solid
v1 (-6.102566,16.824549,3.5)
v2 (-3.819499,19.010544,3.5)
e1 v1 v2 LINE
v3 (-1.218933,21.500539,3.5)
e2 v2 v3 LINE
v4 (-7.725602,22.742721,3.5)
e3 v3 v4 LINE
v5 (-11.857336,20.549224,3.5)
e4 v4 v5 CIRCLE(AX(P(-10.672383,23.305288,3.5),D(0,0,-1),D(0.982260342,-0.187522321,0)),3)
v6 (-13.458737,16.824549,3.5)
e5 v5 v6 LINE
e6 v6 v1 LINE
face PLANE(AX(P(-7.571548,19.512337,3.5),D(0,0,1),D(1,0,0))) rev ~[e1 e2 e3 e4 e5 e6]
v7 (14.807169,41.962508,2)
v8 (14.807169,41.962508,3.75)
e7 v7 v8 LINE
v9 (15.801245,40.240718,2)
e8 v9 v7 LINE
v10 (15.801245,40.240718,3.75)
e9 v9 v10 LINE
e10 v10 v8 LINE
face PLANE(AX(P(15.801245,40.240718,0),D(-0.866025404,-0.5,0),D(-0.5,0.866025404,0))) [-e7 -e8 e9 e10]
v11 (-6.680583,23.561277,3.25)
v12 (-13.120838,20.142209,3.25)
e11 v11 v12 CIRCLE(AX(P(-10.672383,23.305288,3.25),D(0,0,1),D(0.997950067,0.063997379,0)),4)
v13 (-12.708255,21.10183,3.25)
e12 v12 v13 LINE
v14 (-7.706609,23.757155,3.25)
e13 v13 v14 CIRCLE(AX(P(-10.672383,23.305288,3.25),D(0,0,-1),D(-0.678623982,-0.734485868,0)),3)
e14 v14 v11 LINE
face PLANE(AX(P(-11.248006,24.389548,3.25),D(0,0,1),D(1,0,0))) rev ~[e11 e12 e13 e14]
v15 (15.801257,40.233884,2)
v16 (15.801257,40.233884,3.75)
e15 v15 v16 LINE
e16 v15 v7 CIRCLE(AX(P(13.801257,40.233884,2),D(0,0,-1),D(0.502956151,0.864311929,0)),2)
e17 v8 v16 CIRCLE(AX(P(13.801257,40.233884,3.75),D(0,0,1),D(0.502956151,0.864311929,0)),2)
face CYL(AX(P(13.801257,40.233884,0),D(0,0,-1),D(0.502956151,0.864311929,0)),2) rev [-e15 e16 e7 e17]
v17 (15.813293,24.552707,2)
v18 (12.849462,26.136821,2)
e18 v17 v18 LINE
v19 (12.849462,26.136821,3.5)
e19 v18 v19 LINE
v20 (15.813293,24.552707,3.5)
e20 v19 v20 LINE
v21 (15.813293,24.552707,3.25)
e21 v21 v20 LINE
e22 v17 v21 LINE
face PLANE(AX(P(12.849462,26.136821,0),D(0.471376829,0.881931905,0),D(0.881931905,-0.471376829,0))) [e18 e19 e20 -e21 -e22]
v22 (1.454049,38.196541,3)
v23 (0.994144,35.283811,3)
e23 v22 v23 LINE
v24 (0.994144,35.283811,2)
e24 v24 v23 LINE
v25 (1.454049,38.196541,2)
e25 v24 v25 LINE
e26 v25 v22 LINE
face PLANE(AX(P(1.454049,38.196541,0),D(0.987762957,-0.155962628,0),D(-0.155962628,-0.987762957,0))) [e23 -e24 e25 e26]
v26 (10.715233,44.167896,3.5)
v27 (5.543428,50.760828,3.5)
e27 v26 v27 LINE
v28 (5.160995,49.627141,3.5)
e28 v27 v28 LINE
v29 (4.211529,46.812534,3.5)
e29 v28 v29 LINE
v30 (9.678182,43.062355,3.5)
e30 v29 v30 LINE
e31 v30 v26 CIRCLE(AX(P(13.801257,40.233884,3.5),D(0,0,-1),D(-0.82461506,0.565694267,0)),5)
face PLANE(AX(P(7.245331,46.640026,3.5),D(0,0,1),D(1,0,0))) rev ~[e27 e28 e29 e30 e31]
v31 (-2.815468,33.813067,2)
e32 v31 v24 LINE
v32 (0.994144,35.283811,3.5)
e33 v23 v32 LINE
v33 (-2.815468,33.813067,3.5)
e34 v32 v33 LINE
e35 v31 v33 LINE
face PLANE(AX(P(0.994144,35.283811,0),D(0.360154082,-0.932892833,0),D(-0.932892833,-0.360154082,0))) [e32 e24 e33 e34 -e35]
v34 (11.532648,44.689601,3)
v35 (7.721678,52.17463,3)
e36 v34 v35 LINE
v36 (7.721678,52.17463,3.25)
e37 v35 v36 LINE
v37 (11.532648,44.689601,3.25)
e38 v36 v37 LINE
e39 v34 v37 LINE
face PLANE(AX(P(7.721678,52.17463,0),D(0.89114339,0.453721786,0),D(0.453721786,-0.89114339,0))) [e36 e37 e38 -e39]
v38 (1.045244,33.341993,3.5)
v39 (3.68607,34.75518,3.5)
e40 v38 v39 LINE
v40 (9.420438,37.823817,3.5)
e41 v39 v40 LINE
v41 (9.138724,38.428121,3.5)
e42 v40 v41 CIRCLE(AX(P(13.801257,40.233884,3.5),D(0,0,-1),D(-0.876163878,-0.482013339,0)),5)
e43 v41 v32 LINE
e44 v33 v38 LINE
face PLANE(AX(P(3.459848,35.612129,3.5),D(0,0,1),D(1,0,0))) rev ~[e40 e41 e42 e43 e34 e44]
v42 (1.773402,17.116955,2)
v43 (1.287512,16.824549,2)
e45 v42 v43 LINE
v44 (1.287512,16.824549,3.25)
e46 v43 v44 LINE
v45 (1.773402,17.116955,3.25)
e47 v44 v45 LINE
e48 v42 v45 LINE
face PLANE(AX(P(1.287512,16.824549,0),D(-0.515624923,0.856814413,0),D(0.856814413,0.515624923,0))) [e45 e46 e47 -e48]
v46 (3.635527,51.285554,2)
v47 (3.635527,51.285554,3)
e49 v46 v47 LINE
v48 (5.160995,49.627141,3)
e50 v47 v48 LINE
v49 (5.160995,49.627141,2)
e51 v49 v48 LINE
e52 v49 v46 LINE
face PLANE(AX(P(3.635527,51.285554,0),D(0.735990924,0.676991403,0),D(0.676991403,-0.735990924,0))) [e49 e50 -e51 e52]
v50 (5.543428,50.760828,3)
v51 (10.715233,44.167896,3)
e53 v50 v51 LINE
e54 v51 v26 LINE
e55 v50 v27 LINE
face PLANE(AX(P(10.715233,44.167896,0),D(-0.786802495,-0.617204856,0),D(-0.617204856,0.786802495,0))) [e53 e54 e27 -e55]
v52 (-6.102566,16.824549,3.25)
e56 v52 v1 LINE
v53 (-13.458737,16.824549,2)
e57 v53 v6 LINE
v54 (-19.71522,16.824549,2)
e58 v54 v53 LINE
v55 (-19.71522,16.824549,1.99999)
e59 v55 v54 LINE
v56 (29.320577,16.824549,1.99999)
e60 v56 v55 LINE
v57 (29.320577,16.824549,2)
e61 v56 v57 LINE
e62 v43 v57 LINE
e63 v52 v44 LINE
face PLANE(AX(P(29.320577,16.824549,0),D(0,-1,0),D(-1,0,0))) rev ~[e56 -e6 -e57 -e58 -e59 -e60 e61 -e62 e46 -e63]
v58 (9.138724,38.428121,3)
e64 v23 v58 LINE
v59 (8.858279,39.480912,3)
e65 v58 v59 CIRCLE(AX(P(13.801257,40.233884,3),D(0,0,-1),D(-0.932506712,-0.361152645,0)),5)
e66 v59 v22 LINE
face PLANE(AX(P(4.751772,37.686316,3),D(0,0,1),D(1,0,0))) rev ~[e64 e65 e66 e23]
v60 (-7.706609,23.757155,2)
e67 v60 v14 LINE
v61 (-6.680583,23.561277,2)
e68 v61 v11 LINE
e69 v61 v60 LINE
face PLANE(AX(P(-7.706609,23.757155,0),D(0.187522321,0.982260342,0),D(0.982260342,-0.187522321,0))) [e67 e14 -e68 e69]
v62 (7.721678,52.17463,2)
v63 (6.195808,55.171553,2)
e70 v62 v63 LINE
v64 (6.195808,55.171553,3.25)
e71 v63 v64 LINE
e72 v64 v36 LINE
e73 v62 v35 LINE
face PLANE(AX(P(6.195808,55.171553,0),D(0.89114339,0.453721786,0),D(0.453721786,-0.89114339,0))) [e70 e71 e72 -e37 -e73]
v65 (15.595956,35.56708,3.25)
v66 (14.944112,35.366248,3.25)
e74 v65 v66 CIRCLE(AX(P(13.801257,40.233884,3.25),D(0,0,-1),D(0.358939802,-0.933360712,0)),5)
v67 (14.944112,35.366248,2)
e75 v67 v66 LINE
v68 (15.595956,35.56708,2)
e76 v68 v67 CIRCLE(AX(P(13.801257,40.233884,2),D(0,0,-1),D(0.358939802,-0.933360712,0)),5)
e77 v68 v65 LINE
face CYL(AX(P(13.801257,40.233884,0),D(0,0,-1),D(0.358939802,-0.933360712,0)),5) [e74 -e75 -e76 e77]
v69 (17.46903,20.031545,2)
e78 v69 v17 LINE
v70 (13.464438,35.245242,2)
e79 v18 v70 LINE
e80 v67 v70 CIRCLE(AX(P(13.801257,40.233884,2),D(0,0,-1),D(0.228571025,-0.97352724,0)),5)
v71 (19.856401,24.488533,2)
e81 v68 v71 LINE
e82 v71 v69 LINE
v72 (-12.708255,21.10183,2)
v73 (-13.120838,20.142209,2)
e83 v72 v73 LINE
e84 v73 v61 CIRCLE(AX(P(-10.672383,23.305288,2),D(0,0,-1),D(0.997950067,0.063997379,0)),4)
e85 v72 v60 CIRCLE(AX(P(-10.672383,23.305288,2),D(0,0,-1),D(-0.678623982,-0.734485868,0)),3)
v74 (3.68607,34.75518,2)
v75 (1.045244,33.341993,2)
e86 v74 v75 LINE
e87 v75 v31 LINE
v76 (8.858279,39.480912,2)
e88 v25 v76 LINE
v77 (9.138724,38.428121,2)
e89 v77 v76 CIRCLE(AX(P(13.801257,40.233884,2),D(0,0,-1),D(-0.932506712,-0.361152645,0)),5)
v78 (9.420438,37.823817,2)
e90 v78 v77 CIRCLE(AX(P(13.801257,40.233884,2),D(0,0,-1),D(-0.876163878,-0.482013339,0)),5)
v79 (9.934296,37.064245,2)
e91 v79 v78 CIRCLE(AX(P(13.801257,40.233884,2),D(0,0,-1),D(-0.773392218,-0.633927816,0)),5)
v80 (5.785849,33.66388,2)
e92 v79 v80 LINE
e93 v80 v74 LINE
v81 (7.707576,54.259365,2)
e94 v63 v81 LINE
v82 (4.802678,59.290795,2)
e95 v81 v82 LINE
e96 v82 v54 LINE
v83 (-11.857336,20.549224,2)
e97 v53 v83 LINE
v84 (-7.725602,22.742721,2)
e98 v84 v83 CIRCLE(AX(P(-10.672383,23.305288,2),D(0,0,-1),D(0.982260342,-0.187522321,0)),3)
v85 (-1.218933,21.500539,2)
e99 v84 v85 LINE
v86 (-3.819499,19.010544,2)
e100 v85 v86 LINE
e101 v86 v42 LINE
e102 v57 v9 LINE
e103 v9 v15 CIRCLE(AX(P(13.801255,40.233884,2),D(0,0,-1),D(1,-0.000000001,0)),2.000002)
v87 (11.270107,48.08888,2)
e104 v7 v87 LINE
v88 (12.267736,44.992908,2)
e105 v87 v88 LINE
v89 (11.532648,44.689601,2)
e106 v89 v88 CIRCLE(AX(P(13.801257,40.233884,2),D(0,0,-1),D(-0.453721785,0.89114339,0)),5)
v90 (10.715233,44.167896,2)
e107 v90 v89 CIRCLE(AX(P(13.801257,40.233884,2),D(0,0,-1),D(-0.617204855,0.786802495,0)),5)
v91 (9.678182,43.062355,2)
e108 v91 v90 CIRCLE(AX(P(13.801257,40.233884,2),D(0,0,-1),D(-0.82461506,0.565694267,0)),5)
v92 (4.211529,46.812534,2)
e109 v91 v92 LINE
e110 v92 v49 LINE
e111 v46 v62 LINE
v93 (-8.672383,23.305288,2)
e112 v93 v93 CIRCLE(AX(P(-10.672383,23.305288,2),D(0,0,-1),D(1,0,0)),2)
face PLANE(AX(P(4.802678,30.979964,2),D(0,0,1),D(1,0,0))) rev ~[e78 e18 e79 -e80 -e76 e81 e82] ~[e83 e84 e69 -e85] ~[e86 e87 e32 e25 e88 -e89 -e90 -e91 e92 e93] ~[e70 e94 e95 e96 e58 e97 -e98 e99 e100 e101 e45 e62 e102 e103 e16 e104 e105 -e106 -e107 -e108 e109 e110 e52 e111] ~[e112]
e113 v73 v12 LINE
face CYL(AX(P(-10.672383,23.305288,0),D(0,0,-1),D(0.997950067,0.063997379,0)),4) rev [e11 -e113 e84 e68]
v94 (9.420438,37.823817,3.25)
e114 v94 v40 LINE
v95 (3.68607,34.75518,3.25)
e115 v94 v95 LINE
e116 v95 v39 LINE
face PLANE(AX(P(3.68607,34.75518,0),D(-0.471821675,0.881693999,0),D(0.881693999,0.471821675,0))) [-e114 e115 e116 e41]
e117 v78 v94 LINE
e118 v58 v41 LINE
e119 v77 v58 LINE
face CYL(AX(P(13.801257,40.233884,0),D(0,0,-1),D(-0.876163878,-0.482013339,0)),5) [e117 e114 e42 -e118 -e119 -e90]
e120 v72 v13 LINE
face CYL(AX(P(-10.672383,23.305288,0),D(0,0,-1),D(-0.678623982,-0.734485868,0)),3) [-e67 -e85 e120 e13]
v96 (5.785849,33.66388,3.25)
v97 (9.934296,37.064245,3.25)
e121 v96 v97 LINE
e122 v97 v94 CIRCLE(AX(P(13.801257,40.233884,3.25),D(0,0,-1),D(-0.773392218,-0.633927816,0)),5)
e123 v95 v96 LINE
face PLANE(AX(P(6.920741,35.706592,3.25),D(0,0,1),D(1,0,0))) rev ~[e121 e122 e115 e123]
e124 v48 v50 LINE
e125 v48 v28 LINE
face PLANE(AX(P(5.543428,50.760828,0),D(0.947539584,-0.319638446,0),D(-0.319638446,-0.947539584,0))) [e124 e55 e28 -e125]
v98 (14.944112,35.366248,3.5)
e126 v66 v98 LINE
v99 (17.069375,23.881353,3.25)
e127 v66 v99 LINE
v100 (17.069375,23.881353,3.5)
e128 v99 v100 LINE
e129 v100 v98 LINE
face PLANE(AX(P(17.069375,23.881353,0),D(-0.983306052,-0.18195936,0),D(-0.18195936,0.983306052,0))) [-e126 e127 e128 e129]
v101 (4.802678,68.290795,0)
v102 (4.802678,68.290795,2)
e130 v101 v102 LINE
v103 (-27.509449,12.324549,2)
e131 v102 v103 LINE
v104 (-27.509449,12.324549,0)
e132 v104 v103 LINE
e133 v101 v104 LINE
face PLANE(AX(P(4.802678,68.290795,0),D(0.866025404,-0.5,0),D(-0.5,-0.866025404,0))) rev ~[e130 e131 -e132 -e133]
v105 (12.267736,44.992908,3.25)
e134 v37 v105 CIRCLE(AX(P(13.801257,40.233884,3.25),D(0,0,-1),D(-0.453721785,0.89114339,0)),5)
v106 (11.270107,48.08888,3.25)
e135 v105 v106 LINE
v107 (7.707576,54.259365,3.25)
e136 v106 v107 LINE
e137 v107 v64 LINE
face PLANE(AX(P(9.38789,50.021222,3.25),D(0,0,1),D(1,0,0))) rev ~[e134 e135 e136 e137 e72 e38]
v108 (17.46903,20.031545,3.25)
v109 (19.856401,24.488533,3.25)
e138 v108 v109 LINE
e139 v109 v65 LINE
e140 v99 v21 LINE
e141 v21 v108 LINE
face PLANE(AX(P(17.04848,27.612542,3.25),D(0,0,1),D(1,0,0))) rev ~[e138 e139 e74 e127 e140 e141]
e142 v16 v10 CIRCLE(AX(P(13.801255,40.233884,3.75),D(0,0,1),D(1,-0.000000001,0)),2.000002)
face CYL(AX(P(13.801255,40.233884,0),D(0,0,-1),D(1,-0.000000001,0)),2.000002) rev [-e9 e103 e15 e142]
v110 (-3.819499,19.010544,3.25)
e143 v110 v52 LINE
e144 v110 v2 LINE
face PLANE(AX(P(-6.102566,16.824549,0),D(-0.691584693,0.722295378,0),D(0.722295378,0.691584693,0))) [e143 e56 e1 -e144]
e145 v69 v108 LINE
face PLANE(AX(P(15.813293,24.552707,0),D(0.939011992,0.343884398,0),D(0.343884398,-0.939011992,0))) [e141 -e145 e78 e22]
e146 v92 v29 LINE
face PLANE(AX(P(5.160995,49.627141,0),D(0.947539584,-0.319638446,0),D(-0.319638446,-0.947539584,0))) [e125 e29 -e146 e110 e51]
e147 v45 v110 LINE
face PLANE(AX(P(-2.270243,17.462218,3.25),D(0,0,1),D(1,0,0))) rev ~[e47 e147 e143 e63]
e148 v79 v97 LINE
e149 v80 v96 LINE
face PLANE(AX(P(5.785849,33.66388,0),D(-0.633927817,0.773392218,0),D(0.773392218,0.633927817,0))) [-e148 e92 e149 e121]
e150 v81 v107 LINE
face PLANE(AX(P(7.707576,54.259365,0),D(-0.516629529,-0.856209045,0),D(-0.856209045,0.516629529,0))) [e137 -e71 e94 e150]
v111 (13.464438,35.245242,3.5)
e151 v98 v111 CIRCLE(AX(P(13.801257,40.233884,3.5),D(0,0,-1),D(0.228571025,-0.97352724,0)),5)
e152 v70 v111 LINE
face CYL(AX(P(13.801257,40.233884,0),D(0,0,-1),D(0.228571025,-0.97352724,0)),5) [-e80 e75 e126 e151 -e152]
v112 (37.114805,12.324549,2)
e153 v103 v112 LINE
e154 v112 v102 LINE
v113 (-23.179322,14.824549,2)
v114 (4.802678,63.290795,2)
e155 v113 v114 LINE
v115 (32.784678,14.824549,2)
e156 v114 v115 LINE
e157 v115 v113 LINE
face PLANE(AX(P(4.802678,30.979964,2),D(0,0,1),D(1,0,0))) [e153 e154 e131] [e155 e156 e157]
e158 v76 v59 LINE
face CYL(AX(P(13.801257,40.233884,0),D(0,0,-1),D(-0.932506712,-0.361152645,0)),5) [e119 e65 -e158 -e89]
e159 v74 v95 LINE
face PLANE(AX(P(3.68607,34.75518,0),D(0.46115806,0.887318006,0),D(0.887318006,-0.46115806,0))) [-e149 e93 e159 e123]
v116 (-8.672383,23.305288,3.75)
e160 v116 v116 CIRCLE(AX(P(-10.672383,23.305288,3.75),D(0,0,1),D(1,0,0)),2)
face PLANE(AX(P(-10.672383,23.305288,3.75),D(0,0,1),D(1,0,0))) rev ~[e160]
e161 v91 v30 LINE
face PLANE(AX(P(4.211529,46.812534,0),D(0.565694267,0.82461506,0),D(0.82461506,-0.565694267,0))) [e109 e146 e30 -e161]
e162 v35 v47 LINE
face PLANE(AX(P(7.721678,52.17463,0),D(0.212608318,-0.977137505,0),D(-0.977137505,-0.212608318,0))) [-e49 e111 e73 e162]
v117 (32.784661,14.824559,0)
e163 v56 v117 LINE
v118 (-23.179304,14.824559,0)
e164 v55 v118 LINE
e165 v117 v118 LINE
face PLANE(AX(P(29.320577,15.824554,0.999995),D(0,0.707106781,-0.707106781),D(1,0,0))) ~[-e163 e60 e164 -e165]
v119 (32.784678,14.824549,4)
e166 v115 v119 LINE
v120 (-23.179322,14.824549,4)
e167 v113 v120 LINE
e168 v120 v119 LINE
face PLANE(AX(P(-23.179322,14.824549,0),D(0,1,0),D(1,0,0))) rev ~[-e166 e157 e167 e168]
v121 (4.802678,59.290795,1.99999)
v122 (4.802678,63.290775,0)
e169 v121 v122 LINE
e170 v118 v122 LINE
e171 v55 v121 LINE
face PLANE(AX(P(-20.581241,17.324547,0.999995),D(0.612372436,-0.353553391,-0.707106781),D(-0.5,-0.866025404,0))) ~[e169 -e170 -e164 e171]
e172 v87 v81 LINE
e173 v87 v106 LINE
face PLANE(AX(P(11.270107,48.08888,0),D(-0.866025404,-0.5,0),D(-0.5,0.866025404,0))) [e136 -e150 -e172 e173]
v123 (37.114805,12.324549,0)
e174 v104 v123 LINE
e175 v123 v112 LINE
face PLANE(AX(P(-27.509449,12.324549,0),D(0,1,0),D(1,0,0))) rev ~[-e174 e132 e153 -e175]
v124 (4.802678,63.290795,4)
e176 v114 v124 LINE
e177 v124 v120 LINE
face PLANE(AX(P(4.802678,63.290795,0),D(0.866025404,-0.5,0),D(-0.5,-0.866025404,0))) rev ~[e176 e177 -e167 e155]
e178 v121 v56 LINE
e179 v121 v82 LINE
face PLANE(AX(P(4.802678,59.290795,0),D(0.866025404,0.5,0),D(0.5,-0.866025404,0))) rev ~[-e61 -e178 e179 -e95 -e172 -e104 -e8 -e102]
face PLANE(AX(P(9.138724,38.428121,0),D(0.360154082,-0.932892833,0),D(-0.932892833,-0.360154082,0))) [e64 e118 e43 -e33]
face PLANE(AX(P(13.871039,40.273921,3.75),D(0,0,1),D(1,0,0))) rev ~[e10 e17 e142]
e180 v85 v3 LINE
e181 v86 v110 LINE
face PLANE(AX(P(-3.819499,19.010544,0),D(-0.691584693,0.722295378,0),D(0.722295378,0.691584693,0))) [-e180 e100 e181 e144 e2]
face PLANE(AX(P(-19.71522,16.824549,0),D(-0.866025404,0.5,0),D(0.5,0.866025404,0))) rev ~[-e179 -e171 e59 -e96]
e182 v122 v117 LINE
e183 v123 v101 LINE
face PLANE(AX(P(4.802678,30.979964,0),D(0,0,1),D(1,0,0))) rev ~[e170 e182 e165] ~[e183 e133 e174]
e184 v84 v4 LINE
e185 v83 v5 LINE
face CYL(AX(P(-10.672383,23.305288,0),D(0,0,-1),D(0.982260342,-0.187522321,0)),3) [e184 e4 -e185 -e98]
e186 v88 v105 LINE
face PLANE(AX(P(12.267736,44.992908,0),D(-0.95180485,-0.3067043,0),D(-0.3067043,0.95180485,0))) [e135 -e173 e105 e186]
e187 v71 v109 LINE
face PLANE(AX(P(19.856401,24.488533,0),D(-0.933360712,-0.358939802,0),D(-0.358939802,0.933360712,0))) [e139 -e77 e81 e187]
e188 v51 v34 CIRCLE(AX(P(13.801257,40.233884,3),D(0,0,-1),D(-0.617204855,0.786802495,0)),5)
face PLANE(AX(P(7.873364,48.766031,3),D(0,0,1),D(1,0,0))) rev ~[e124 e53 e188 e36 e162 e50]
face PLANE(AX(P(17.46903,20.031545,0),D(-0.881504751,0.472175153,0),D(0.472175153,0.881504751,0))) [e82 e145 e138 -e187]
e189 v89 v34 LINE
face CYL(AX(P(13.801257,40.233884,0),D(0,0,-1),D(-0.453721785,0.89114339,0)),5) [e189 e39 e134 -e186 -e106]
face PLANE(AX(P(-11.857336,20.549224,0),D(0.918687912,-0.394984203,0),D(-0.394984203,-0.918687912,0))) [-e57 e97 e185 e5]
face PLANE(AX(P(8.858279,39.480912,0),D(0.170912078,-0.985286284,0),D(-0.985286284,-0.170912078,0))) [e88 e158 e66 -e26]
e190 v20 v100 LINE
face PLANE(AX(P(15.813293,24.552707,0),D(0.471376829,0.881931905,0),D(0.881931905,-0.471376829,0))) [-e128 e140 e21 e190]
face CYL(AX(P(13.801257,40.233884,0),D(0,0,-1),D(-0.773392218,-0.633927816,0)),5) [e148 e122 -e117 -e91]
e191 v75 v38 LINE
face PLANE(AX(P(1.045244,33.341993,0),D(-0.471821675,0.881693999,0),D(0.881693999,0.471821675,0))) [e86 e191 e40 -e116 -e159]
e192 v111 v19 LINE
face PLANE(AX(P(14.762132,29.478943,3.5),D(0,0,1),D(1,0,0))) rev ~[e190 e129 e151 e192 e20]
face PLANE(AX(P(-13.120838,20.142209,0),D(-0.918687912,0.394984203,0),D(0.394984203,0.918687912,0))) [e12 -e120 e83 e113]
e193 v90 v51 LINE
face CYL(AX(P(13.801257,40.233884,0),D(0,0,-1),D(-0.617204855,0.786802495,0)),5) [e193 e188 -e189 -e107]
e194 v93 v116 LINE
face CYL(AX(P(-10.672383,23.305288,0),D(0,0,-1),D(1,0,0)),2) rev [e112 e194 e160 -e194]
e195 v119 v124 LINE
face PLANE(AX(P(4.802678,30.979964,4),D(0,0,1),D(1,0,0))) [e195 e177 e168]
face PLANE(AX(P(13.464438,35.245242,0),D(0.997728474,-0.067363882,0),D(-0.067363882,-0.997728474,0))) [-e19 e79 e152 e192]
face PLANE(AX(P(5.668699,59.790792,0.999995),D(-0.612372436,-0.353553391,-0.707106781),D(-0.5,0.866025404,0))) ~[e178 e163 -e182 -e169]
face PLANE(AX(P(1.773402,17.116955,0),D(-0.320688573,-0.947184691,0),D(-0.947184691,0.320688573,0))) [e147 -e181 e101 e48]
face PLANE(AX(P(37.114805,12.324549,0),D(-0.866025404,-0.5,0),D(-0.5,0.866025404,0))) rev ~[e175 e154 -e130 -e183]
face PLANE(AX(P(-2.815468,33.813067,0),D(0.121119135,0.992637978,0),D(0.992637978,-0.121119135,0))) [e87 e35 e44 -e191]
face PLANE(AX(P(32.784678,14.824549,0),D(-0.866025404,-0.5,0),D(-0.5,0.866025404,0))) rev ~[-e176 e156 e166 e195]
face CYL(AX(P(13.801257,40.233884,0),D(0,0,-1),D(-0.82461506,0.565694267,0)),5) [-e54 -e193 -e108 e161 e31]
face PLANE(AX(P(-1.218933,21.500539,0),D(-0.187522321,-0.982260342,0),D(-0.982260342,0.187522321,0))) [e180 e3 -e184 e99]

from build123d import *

# Parameters (mm, degrees)
F1_DEPTH = 4
F2_DEPTH = 2
F3_START = 2
F3_DEPTH = 2
F4_SIZE  = 1.99999
F5_R     = 2
F6_DEPTH = 3.75
F7_DEPTH = 3.5
F8_DEPTH = 3.25
F9_DEPTH = 3


# Not quite as in the source:
# - a fillet or chamfer is up to 0.001 mm smaller than in the source, because OpenCascade refuses the exact size


with BuildPart() as f1:
    # F0 (on Top) → F1 (new body)
    with BuildSketch(Plane.XY):
        Polygon((32.7846783229, 14.824549064), (4.8026783229, 63.2907947614), (-23.1793216771, 14.824549064), align=None)
        Polygon((-19.715220062, 16.824549064), (4.8026783229, 59.2907947614), (29.3205767077, 16.824549064), align=None, mode=Mode.SUBTRACT)
    extrude(amount=F1_DEPTH)

    # F0 (on Top) → F2 (join)
    with BuildSketch(Plane.XY):
        Polygon((37.1148053418, 12.324549064), (4.8026783229, 68.2907947614), (-27.509448696, 12.324549064), align=None)
        Polygon((-23.1793216771, 14.824549064), (4.8026783229, 63.2907947614), (32.7846783229, 14.824549064), align=None, mode=Mode.SUBTRACT)
    extrude(amount=F2_DEPTH)

    # F0 (on Top) → F3 (join)
    with BuildSketch(Plane.XY.offset(F3_START)):
        Polygon((29.3205767077, 16.824549064), (4.8026783229, 59.2907947614), (-19.715220062, 16.824549064), align=None)
    extrude(amount=F3_DEPTH)

    # F4 (size 2 in the source; OpenCascade refuses exactly that, so slightly less here)
    f4_edges = [f1.edges().sort_by_distance(p)[0] for p in [
        (4.802678, 16.824549, 0),
        (-7.456271, 38.057672, 0),
        (17.061628, 38.057672, 0),
    ]]
    chamfer(f4_edges, length=F4_SIZE)

    # F5 (on face) → F6 (cut)
    with BuildSketch(Plane.XY):
        with BuildLine():
            Line((15.8012454512, 40.2407176847), (14.8071694273, 41.9625078646))
            ThreePointArc((14.8071694273, 41.9625078646), (12.0675004242, 39.2368445398), (15.801257126, 40.2338840067))
            ThreePointArc((15.801257126, 40.2338840067), (15.8012542073, 40.2373008507), (15.8012454512, 40.2407176847))
        make_face()
        with Locations((-10.6723830104, 23.3052875847)):
            Circle(F5_R)
    extrude(amount=F6_DEPTH, mode=Mode.SUBTRACT)

    # F5 (on face) → F7 (cut)
    with BuildSketch(Plane.XY):
        with BuildLine():
            Line((3.6860700174, 34.755180139), (9.4204377363, 37.8238173116))
            ThreePointArc((9.4204377363, 37.8238173116), (9.2694965624, 38.1212680469), (9.1387235678, 38.4281207834))
            Line((9.1387235678, 38.4281207834), (0.9941436583, 35.2838113904))
            Line((0.9941436583, 35.2838113904), (-2.8154677711, 33.8130667806))
            Line((-2.8154677711, 33.8130667806), (1.0452440474, 33.3419926465))
            Line((1.0452440474, 33.3419926465), (3.6860700174, 34.755180139))
        make_face()
        with BuildLine():
            Line((17.0693753854, 23.8813530259), (14.9441122519, 35.3662478082))
            ThreePointArc((14.9441122519, 35.3662478082), (14.2087911946, 35.2505200844), (13.4644377158, 35.2452416378))
            Line((13.4644377158, 35.2452416378), (12.8494622186, 26.1368211359))
            Line((12.8494622186, 26.1368211359), (15.8132929355, 24.552706629))
            Line((15.8132929355, 24.552706629), (17.0693753854, 23.8813530259))
        make_face()
        with BuildLine():
            Line((-13.4587365793, 16.824549064), (-6.1025659626, 16.824549064))
            Line((-6.1025659626, 16.824549064), (-3.819498702, 19.0105444595))
            Line((-3.819498702, 19.0105444595), (-1.2189327972, 21.5005390346))
            Line((-1.2189327972, 21.5005390346), (-7.725601985, 22.742720621))
            ThreePointArc((-7.725601985, 22.742720621), (-9.2656609828, 20.6555454959), (-11.8573356204, 20.5492238495))
            Line((-11.8573356204, 20.5492238495), (-13.4587365793, 16.824549064))
        make_face()
        with BuildLine():
            ThreePointArc((9.6781818277, 43.0623553402), (10.154568974, 43.6546537332), (10.7152328484, 44.1678964823))
            Line((10.7152328484, 44.1678964823), (5.5434275419, 50.7608279586))
            Line((5.5434275419, 50.7608279586), (5.1609951292, 49.6271412781))
            Line((5.1609951292, 49.6271412781), (4.2115291581, 46.8125343323))
            Line((4.2115291581, 46.8125343323), (9.6781818277, 43.0623553402))
        make_face()
    extrude(amount=F7_DEPTH, mode=Mode.SUBTRACT)

    # F5 (on face) → F8 (cut)
    with BuildSketch(Plane.XY):
        with BuildLine():
            Line((19.8564007878, 24.4885329157), (15.5959561349, 35.5670804467))
            ThreePointArc((15.5959561349, 35.5670804467), (15.2734627879, 35.4555359146), (14.9441122519, 35.3662478082))
            Line((14.9441122519, 35.3662478082), (17.0693753854, 23.8813530259))
            Line((17.0693753854, 23.8813530259), (15.8132929355, 24.552706629))
            Line((15.8132929355, 24.552706629), (17.4690298736, 20.0315453112))
            Line((17.4690298736, 20.0315453112), (19.8564007878, 24.4885329157))
        make_face()
        Polygon((-6.1025659626, 16.824549064), (1.2875116271, 16.824549064), (1.7734020948, 17.1169545501), (-3.819498702, 19.0105444595), align=None)
        with BuildLine():
            Line((5.785849411, 33.66388008), (9.9342960343, 37.064244924))
            ThreePointArc((9.9342960343, 37.064244924), (9.6599157648, 37.4322252607), (9.4204377363, 37.8238173116))
            Line((9.4204377363, 37.8238173116), (3.6860700174, 34.755180139))
            Line((3.6860700174, 34.755180139), (5.785849411, 33.66388008))
        make_face()
        with BuildLine():
            ThreePointArc((11.5326481984, 44.6896009562), (11.8941525727, 44.8558913869), (12.2677356256, 44.9929082563))
            Line((12.2677356256, 44.9929082563), (11.2701070238, 48.0888796571))
            Line((11.2701070238, 48.0888796571), (7.7075759005, 54.2593645662))
            Line((7.7075759005, 54.2593645662), (6.1958078295, 55.1715530455))
            Line((6.1958078295, 55.1715530455), (7.7216781624, 52.1746300315))
            Line((7.7216781624, 52.1746300315), (11.5326481984, 44.6896009562))
        make_face()
        with BuildLine():
            ThreePointArc((-12.7082549566, 21.1018299793), (-12.079105038, 25.9550296735), (-7.7066088949, 23.7571547066))
            Line((-7.7066088949, 23.7571547066), (-6.6805827438, 23.5612770993))
            ThreePointArc((-6.6805827438, 23.5612770993), (-12.5480123805, 26.8382770364), (-13.1208381636, 20.1422088056))
            Line((-13.1208381636, 20.1422088056), (-12.7082549566, 21.1018299793))
        make_face()
    extrude(amount=F8_DEPTH, mode=Mode.SUBTRACT)

    # F5 (on face) → F9 (cut)
    with BuildSketch(Plane.XY):
        with BuildLine():
            ThreePointArc((9.1387235678, 38.4281207834), (8.9697402045, 38.9468547775), (8.8582790135, 39.4809116441))
            Line((8.8582790135, 39.4809116441), (1.4540485572, 38.196541369))
            Line((1.4540485572, 38.196541369), (0.9941436583, 35.2838113904))
            Line((0.9941436583, 35.2838113904), (9.1387235678, 38.4281207834))
        make_face()
        with BuildLine():
            ThreePointArc((10.7152328484, 44.1678964823), (11.1112630591, 44.4486119837), (11.5326481984, 44.6896009562))
            Line((11.5326481984, 44.6896009562), (7.7216781624, 52.1746300315))
            Line((7.7216781624, 52.1746300315), (3.6355266348, 51.2855537236))
            Line((3.6355266348, 51.2855537236), (5.1609951292, 49.6271412781))
            Line((5.1609951292, 49.6271412781), (5.5434275419, 50.7608279586))
            Line((5.5434275419, 50.7608279586), (10.7152328484, 44.1678964823))
        make_face()
    extrude(amount=F9_DEPTH, mode=Mode.SUBTRACT)


solid = f1.part
